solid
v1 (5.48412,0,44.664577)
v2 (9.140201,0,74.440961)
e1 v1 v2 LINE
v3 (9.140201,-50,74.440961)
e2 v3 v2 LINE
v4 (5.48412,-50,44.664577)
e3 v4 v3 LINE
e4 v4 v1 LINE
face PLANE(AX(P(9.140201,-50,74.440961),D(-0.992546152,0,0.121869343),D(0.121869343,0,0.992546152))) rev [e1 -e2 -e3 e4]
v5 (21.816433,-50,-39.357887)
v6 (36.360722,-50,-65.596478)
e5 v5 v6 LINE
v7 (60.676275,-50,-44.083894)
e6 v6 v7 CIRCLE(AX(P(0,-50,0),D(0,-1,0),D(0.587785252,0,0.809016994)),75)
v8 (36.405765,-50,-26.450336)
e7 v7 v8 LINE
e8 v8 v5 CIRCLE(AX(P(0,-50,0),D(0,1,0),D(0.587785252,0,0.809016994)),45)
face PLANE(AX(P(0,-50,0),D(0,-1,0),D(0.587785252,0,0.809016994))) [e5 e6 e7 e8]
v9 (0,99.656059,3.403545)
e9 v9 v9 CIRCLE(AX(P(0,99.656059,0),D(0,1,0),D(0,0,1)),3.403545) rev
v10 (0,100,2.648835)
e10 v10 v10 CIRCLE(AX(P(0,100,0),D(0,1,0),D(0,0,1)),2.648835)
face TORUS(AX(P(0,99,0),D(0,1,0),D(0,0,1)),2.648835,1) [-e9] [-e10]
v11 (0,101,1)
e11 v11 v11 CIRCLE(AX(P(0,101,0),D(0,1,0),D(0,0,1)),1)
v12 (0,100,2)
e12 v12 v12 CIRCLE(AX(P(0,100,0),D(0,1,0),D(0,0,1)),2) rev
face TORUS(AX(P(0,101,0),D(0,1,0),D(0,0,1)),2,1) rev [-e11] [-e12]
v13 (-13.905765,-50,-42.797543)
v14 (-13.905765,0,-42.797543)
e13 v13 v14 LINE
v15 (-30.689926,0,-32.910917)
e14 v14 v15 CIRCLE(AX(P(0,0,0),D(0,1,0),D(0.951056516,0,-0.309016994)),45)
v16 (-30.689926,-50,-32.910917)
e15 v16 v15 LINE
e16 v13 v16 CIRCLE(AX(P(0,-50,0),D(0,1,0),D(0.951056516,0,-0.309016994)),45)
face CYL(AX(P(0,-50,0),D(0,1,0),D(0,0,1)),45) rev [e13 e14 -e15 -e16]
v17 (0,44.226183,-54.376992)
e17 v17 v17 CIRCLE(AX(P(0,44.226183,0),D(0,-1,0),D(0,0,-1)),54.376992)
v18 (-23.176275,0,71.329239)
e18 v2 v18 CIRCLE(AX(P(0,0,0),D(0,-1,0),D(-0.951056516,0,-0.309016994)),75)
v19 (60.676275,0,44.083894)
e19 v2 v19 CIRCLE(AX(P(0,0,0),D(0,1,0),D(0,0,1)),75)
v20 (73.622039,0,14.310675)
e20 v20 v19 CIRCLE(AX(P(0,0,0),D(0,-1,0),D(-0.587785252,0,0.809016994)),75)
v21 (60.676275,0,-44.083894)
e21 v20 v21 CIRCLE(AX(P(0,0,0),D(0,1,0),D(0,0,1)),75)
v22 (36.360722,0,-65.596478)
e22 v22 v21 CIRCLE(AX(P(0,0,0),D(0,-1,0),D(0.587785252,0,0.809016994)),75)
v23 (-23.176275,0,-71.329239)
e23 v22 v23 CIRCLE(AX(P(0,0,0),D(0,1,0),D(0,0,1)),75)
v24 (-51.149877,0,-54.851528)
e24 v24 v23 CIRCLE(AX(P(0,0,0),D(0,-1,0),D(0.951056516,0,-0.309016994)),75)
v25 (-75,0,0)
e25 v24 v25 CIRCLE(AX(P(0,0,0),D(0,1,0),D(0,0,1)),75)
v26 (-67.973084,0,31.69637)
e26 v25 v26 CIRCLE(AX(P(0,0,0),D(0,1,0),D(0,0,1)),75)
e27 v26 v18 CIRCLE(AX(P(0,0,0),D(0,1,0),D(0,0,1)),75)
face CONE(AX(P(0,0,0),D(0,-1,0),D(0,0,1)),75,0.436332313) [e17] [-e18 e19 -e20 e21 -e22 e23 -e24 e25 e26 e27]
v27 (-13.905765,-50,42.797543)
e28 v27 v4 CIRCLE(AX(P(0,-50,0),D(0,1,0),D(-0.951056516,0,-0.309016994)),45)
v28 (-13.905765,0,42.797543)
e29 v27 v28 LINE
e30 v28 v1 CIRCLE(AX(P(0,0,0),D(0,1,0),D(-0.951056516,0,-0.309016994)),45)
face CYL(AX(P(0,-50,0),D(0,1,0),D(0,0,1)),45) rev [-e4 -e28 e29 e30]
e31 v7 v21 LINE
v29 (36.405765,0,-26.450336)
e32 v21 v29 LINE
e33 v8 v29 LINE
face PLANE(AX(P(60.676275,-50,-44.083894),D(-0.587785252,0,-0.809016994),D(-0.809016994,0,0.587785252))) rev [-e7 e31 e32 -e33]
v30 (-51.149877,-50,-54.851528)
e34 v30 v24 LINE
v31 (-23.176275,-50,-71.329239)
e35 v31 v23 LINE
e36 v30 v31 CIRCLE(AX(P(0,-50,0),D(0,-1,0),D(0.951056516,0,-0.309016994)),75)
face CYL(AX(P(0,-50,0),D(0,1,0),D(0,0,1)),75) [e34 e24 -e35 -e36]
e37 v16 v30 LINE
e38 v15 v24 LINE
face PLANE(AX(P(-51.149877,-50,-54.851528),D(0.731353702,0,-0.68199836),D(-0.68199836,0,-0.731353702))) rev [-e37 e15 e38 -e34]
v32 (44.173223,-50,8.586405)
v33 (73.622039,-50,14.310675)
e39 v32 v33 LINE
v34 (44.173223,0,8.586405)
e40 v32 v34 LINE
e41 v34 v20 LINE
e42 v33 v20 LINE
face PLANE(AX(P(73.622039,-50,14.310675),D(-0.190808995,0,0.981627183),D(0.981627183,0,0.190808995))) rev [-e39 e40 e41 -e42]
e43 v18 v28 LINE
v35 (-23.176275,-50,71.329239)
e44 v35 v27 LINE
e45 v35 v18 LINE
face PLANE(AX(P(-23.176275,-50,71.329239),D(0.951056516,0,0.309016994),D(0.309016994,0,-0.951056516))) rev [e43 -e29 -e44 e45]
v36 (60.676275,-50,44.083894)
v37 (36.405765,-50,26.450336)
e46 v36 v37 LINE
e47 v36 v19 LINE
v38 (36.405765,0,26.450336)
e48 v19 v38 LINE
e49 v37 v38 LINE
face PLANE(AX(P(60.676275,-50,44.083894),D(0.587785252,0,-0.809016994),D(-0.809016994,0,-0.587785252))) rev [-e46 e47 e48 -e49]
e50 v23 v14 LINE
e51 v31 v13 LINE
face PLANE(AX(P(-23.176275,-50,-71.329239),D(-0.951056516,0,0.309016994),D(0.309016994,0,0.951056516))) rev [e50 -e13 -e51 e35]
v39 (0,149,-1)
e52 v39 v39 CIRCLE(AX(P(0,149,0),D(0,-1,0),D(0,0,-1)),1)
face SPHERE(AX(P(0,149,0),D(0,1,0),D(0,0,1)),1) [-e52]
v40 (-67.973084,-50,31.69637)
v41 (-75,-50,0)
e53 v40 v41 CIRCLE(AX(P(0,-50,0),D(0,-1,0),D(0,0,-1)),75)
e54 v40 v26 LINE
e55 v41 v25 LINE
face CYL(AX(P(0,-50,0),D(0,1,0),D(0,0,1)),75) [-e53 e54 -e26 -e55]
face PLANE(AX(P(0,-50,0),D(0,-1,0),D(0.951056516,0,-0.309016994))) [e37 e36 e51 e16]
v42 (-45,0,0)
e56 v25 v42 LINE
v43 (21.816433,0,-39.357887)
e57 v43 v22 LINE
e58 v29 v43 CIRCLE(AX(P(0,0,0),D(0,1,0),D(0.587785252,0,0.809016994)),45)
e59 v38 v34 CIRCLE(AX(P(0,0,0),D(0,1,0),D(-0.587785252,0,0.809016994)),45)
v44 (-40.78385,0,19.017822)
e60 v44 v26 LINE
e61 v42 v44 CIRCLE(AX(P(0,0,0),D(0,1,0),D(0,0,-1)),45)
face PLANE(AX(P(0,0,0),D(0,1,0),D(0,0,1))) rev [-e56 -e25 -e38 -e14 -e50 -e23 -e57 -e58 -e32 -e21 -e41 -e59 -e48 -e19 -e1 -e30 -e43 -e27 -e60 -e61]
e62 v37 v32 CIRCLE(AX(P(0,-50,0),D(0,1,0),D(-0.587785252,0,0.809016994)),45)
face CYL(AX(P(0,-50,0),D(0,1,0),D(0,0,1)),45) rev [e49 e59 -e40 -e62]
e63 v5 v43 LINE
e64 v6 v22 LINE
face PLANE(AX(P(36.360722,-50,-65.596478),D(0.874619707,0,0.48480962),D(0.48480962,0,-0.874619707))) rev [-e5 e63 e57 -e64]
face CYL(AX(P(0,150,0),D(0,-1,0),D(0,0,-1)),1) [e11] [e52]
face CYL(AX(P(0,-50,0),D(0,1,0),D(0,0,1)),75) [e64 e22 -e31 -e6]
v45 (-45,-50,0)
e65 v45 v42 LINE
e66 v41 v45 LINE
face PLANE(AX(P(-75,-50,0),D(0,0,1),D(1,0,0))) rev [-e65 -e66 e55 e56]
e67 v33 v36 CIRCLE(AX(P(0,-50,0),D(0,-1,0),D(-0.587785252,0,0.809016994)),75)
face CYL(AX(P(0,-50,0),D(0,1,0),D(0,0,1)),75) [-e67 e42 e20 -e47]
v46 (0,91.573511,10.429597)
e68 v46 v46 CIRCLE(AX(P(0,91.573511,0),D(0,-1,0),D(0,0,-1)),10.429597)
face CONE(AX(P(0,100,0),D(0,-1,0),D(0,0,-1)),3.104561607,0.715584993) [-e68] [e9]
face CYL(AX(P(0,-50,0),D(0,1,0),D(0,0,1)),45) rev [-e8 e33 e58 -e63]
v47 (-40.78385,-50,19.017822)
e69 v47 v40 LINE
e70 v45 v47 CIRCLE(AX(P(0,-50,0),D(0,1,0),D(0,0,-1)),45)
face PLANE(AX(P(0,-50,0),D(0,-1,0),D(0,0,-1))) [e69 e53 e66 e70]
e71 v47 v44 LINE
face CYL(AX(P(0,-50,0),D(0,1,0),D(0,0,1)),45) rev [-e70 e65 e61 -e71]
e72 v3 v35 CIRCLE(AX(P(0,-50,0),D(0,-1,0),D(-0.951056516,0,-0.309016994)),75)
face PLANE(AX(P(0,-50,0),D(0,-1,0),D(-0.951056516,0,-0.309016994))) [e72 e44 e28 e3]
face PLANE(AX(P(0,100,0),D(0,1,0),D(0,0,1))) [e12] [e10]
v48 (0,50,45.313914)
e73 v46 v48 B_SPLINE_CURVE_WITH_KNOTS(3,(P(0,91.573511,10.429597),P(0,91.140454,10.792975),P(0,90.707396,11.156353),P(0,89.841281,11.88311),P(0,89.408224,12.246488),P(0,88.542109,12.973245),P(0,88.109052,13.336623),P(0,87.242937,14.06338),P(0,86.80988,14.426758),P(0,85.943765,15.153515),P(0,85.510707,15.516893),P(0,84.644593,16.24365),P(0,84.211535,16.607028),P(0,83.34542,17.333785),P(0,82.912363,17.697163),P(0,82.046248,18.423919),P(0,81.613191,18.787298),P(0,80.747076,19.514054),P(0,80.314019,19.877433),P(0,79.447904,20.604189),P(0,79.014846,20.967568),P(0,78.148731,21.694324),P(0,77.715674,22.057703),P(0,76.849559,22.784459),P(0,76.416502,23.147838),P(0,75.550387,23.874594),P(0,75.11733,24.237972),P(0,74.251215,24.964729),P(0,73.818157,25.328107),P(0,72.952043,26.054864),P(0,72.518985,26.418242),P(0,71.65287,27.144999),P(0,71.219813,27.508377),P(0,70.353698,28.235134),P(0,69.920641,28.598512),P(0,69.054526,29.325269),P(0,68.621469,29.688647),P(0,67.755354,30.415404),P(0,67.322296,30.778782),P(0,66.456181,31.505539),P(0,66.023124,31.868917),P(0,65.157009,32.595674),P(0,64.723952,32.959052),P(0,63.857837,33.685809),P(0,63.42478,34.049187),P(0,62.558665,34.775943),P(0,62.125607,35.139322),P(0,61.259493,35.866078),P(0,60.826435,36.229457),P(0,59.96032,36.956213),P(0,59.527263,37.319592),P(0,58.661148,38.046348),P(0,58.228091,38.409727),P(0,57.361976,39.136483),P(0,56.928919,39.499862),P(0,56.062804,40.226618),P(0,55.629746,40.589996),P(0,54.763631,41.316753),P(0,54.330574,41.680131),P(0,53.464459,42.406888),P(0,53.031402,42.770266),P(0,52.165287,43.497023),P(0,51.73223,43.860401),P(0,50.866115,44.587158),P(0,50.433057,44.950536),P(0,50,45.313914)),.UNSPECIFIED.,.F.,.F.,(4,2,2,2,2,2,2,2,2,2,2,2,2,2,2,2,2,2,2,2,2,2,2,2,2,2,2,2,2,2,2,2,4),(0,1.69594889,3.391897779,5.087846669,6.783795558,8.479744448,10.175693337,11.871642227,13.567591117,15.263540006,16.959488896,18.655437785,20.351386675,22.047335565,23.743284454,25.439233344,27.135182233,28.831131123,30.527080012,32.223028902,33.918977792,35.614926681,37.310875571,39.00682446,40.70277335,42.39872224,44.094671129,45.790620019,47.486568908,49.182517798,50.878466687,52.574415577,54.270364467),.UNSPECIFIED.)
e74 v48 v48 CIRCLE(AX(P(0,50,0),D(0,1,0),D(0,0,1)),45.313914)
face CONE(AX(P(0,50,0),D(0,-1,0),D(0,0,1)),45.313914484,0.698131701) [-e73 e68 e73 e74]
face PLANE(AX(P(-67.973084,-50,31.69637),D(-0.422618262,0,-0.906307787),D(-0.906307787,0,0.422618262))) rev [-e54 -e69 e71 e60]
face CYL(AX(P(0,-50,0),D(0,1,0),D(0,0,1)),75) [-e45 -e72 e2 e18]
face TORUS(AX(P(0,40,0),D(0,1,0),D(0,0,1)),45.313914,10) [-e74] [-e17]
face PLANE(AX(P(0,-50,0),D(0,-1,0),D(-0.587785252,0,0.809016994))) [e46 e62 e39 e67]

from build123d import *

# Parameters (mm, degrees)
PROFIL_BASE_R                = 75
BASE_DEPTH                   = 50
BASE_TAPER                   = 25
CONG_1_R                     = 10
PIED_DEPTH                   = 50
R_P_TITION_CIRCULAIRE1_COUNT = 5
ESQUISSE3_R                  = 45.313914484
BOSS_EXTRU_3_DEPTH           = 50
BOSS_EXTRU_3_TAPER           = 40
ESQUISSE5_R                  = 1
BOSS_EXTRU_4_DEPTH           = 50
CONG_2_R                     = 1
CHANFREIN1_SIZE              = 0.254371318
CHANFREIN1_SIZE_2            = 11
CONG_3_R                     = 1
CONG_4_R                     = 1


with BuildPart() as part:
    # profil Base → Base (new body)
    with BuildSketch(Plane(origin=(0, 0, 0), x_dir=(1, 0, 0), z_dir=(0, 1, 0))):
        Circle(PROFIL_BASE_R)
    extrude(amount=BASE_DEPTH, taper=BASE_TAPER)

    # Congé1
    cong_1_edges = [part.edges().sort_by_distance(p)[0] for p in [
        (-51.684617092, 50, 0),
    ]]
    fillet(cong_1_edges, radius=CONG_1_R)

    # Profil Pied → Pied (add)
    with BuildSketch(Plane.XZ):
        with BuildLine():
            Line((-75, 0), (-45, 0))
            ThreePointArc((-45, 0), (-43.93332032, 9.739782627), (-40.783850417, 19.017821778))
            Line((-40.783850417, 19.017821778), (-67.973084028, 31.696369631))
            ThreePointArc((-67.973084028, 31.696369631), (-73.222200534, 16.232971045), (-75, 0))
        make_face()
    pied = extrude(amount=PIED_DEPTH)

    # Répétition circulaire1: Pied ×5 about axis
    r_p_tition_circulaire1_axis = Axis((0, 0, 0), (0, 1, 0))
    for i in range(1, R_P_TITION_CIRCULAIRE1_COUNT):
        add(pied.rotate(r_p_tition_circulaire1_axis, i * 360 / R_P_TITION_CIRCULAIRE1_COUNT))

    # Esquisse3 → Boss.-Extru.3 (add)
    with BuildSketch(Plane(origin=(0, 50, 0), x_dir=(1, 0, 0), z_dir=(0, 1, 0))):
        Circle(ESQUISSE3_R)
    extrude(amount=BOSS_EXTRU_3_DEPTH, taper=BOSS_EXTRU_3_TAPER)

    # Esquisse5 → Boss.-Extru.4 (add)
    with BuildSketch(Plane(origin=(0, 100, 0), x_dir=(1, 0, 0), z_dir=(0, 1, 0))):
        with Locations(Location((0, 0, 0), (0, 0, 270))):
            Circle(ESQUISSE5_R)
    extrude(amount=BOSS_EXTRU_4_DEPTH)

    # Congé2
    cong_2_edges = [part.edges().sort_by_distance(p)[0] for p in [
        (0, 150, -1),
    ]]
    fillet(cong_2_edges, radius=CONG_2_R)

    # Chanfrein1
    # the kernel refuses this chamfer: 11, 0.254371318 mm, written as the material it takes off along each edge
    with BuildSketch(Plane(origin=(0, 100, 0), x_dir=(1, 0, 0), z_dir=(0, 0, -1))) as chanfrein1_piece_1:
        Polygon((3.358932925 - CHANFREIN1_SIZE, 0), (3.358932925 + CHANFREIN1_SIZE_2 * 0.642787609687, CHANFREIN1_SIZE_2 * 0.766044443119), (3.358932925, 0), align=None)
    revolve(axis=Axis((0, 100, 0), (0, -1, 0)), mode=Mode.SUBTRACT)

    # Congé3
    cong_3_edges = [part.edges().sort_by_distance(p)[0] for p in [
        (-3.104561607, 100, 0),
    ]]
    fillet(cong_3_edges, radius=CONG_3_R)

    # Congé4
    cong_4_edges = [part.edges().sort_by_distance(p)[0] for p in [
        (0, 100, -1),
    ]]
    fillet(cong_4_edges, radius=CONG_4_R)


solid = part.part
